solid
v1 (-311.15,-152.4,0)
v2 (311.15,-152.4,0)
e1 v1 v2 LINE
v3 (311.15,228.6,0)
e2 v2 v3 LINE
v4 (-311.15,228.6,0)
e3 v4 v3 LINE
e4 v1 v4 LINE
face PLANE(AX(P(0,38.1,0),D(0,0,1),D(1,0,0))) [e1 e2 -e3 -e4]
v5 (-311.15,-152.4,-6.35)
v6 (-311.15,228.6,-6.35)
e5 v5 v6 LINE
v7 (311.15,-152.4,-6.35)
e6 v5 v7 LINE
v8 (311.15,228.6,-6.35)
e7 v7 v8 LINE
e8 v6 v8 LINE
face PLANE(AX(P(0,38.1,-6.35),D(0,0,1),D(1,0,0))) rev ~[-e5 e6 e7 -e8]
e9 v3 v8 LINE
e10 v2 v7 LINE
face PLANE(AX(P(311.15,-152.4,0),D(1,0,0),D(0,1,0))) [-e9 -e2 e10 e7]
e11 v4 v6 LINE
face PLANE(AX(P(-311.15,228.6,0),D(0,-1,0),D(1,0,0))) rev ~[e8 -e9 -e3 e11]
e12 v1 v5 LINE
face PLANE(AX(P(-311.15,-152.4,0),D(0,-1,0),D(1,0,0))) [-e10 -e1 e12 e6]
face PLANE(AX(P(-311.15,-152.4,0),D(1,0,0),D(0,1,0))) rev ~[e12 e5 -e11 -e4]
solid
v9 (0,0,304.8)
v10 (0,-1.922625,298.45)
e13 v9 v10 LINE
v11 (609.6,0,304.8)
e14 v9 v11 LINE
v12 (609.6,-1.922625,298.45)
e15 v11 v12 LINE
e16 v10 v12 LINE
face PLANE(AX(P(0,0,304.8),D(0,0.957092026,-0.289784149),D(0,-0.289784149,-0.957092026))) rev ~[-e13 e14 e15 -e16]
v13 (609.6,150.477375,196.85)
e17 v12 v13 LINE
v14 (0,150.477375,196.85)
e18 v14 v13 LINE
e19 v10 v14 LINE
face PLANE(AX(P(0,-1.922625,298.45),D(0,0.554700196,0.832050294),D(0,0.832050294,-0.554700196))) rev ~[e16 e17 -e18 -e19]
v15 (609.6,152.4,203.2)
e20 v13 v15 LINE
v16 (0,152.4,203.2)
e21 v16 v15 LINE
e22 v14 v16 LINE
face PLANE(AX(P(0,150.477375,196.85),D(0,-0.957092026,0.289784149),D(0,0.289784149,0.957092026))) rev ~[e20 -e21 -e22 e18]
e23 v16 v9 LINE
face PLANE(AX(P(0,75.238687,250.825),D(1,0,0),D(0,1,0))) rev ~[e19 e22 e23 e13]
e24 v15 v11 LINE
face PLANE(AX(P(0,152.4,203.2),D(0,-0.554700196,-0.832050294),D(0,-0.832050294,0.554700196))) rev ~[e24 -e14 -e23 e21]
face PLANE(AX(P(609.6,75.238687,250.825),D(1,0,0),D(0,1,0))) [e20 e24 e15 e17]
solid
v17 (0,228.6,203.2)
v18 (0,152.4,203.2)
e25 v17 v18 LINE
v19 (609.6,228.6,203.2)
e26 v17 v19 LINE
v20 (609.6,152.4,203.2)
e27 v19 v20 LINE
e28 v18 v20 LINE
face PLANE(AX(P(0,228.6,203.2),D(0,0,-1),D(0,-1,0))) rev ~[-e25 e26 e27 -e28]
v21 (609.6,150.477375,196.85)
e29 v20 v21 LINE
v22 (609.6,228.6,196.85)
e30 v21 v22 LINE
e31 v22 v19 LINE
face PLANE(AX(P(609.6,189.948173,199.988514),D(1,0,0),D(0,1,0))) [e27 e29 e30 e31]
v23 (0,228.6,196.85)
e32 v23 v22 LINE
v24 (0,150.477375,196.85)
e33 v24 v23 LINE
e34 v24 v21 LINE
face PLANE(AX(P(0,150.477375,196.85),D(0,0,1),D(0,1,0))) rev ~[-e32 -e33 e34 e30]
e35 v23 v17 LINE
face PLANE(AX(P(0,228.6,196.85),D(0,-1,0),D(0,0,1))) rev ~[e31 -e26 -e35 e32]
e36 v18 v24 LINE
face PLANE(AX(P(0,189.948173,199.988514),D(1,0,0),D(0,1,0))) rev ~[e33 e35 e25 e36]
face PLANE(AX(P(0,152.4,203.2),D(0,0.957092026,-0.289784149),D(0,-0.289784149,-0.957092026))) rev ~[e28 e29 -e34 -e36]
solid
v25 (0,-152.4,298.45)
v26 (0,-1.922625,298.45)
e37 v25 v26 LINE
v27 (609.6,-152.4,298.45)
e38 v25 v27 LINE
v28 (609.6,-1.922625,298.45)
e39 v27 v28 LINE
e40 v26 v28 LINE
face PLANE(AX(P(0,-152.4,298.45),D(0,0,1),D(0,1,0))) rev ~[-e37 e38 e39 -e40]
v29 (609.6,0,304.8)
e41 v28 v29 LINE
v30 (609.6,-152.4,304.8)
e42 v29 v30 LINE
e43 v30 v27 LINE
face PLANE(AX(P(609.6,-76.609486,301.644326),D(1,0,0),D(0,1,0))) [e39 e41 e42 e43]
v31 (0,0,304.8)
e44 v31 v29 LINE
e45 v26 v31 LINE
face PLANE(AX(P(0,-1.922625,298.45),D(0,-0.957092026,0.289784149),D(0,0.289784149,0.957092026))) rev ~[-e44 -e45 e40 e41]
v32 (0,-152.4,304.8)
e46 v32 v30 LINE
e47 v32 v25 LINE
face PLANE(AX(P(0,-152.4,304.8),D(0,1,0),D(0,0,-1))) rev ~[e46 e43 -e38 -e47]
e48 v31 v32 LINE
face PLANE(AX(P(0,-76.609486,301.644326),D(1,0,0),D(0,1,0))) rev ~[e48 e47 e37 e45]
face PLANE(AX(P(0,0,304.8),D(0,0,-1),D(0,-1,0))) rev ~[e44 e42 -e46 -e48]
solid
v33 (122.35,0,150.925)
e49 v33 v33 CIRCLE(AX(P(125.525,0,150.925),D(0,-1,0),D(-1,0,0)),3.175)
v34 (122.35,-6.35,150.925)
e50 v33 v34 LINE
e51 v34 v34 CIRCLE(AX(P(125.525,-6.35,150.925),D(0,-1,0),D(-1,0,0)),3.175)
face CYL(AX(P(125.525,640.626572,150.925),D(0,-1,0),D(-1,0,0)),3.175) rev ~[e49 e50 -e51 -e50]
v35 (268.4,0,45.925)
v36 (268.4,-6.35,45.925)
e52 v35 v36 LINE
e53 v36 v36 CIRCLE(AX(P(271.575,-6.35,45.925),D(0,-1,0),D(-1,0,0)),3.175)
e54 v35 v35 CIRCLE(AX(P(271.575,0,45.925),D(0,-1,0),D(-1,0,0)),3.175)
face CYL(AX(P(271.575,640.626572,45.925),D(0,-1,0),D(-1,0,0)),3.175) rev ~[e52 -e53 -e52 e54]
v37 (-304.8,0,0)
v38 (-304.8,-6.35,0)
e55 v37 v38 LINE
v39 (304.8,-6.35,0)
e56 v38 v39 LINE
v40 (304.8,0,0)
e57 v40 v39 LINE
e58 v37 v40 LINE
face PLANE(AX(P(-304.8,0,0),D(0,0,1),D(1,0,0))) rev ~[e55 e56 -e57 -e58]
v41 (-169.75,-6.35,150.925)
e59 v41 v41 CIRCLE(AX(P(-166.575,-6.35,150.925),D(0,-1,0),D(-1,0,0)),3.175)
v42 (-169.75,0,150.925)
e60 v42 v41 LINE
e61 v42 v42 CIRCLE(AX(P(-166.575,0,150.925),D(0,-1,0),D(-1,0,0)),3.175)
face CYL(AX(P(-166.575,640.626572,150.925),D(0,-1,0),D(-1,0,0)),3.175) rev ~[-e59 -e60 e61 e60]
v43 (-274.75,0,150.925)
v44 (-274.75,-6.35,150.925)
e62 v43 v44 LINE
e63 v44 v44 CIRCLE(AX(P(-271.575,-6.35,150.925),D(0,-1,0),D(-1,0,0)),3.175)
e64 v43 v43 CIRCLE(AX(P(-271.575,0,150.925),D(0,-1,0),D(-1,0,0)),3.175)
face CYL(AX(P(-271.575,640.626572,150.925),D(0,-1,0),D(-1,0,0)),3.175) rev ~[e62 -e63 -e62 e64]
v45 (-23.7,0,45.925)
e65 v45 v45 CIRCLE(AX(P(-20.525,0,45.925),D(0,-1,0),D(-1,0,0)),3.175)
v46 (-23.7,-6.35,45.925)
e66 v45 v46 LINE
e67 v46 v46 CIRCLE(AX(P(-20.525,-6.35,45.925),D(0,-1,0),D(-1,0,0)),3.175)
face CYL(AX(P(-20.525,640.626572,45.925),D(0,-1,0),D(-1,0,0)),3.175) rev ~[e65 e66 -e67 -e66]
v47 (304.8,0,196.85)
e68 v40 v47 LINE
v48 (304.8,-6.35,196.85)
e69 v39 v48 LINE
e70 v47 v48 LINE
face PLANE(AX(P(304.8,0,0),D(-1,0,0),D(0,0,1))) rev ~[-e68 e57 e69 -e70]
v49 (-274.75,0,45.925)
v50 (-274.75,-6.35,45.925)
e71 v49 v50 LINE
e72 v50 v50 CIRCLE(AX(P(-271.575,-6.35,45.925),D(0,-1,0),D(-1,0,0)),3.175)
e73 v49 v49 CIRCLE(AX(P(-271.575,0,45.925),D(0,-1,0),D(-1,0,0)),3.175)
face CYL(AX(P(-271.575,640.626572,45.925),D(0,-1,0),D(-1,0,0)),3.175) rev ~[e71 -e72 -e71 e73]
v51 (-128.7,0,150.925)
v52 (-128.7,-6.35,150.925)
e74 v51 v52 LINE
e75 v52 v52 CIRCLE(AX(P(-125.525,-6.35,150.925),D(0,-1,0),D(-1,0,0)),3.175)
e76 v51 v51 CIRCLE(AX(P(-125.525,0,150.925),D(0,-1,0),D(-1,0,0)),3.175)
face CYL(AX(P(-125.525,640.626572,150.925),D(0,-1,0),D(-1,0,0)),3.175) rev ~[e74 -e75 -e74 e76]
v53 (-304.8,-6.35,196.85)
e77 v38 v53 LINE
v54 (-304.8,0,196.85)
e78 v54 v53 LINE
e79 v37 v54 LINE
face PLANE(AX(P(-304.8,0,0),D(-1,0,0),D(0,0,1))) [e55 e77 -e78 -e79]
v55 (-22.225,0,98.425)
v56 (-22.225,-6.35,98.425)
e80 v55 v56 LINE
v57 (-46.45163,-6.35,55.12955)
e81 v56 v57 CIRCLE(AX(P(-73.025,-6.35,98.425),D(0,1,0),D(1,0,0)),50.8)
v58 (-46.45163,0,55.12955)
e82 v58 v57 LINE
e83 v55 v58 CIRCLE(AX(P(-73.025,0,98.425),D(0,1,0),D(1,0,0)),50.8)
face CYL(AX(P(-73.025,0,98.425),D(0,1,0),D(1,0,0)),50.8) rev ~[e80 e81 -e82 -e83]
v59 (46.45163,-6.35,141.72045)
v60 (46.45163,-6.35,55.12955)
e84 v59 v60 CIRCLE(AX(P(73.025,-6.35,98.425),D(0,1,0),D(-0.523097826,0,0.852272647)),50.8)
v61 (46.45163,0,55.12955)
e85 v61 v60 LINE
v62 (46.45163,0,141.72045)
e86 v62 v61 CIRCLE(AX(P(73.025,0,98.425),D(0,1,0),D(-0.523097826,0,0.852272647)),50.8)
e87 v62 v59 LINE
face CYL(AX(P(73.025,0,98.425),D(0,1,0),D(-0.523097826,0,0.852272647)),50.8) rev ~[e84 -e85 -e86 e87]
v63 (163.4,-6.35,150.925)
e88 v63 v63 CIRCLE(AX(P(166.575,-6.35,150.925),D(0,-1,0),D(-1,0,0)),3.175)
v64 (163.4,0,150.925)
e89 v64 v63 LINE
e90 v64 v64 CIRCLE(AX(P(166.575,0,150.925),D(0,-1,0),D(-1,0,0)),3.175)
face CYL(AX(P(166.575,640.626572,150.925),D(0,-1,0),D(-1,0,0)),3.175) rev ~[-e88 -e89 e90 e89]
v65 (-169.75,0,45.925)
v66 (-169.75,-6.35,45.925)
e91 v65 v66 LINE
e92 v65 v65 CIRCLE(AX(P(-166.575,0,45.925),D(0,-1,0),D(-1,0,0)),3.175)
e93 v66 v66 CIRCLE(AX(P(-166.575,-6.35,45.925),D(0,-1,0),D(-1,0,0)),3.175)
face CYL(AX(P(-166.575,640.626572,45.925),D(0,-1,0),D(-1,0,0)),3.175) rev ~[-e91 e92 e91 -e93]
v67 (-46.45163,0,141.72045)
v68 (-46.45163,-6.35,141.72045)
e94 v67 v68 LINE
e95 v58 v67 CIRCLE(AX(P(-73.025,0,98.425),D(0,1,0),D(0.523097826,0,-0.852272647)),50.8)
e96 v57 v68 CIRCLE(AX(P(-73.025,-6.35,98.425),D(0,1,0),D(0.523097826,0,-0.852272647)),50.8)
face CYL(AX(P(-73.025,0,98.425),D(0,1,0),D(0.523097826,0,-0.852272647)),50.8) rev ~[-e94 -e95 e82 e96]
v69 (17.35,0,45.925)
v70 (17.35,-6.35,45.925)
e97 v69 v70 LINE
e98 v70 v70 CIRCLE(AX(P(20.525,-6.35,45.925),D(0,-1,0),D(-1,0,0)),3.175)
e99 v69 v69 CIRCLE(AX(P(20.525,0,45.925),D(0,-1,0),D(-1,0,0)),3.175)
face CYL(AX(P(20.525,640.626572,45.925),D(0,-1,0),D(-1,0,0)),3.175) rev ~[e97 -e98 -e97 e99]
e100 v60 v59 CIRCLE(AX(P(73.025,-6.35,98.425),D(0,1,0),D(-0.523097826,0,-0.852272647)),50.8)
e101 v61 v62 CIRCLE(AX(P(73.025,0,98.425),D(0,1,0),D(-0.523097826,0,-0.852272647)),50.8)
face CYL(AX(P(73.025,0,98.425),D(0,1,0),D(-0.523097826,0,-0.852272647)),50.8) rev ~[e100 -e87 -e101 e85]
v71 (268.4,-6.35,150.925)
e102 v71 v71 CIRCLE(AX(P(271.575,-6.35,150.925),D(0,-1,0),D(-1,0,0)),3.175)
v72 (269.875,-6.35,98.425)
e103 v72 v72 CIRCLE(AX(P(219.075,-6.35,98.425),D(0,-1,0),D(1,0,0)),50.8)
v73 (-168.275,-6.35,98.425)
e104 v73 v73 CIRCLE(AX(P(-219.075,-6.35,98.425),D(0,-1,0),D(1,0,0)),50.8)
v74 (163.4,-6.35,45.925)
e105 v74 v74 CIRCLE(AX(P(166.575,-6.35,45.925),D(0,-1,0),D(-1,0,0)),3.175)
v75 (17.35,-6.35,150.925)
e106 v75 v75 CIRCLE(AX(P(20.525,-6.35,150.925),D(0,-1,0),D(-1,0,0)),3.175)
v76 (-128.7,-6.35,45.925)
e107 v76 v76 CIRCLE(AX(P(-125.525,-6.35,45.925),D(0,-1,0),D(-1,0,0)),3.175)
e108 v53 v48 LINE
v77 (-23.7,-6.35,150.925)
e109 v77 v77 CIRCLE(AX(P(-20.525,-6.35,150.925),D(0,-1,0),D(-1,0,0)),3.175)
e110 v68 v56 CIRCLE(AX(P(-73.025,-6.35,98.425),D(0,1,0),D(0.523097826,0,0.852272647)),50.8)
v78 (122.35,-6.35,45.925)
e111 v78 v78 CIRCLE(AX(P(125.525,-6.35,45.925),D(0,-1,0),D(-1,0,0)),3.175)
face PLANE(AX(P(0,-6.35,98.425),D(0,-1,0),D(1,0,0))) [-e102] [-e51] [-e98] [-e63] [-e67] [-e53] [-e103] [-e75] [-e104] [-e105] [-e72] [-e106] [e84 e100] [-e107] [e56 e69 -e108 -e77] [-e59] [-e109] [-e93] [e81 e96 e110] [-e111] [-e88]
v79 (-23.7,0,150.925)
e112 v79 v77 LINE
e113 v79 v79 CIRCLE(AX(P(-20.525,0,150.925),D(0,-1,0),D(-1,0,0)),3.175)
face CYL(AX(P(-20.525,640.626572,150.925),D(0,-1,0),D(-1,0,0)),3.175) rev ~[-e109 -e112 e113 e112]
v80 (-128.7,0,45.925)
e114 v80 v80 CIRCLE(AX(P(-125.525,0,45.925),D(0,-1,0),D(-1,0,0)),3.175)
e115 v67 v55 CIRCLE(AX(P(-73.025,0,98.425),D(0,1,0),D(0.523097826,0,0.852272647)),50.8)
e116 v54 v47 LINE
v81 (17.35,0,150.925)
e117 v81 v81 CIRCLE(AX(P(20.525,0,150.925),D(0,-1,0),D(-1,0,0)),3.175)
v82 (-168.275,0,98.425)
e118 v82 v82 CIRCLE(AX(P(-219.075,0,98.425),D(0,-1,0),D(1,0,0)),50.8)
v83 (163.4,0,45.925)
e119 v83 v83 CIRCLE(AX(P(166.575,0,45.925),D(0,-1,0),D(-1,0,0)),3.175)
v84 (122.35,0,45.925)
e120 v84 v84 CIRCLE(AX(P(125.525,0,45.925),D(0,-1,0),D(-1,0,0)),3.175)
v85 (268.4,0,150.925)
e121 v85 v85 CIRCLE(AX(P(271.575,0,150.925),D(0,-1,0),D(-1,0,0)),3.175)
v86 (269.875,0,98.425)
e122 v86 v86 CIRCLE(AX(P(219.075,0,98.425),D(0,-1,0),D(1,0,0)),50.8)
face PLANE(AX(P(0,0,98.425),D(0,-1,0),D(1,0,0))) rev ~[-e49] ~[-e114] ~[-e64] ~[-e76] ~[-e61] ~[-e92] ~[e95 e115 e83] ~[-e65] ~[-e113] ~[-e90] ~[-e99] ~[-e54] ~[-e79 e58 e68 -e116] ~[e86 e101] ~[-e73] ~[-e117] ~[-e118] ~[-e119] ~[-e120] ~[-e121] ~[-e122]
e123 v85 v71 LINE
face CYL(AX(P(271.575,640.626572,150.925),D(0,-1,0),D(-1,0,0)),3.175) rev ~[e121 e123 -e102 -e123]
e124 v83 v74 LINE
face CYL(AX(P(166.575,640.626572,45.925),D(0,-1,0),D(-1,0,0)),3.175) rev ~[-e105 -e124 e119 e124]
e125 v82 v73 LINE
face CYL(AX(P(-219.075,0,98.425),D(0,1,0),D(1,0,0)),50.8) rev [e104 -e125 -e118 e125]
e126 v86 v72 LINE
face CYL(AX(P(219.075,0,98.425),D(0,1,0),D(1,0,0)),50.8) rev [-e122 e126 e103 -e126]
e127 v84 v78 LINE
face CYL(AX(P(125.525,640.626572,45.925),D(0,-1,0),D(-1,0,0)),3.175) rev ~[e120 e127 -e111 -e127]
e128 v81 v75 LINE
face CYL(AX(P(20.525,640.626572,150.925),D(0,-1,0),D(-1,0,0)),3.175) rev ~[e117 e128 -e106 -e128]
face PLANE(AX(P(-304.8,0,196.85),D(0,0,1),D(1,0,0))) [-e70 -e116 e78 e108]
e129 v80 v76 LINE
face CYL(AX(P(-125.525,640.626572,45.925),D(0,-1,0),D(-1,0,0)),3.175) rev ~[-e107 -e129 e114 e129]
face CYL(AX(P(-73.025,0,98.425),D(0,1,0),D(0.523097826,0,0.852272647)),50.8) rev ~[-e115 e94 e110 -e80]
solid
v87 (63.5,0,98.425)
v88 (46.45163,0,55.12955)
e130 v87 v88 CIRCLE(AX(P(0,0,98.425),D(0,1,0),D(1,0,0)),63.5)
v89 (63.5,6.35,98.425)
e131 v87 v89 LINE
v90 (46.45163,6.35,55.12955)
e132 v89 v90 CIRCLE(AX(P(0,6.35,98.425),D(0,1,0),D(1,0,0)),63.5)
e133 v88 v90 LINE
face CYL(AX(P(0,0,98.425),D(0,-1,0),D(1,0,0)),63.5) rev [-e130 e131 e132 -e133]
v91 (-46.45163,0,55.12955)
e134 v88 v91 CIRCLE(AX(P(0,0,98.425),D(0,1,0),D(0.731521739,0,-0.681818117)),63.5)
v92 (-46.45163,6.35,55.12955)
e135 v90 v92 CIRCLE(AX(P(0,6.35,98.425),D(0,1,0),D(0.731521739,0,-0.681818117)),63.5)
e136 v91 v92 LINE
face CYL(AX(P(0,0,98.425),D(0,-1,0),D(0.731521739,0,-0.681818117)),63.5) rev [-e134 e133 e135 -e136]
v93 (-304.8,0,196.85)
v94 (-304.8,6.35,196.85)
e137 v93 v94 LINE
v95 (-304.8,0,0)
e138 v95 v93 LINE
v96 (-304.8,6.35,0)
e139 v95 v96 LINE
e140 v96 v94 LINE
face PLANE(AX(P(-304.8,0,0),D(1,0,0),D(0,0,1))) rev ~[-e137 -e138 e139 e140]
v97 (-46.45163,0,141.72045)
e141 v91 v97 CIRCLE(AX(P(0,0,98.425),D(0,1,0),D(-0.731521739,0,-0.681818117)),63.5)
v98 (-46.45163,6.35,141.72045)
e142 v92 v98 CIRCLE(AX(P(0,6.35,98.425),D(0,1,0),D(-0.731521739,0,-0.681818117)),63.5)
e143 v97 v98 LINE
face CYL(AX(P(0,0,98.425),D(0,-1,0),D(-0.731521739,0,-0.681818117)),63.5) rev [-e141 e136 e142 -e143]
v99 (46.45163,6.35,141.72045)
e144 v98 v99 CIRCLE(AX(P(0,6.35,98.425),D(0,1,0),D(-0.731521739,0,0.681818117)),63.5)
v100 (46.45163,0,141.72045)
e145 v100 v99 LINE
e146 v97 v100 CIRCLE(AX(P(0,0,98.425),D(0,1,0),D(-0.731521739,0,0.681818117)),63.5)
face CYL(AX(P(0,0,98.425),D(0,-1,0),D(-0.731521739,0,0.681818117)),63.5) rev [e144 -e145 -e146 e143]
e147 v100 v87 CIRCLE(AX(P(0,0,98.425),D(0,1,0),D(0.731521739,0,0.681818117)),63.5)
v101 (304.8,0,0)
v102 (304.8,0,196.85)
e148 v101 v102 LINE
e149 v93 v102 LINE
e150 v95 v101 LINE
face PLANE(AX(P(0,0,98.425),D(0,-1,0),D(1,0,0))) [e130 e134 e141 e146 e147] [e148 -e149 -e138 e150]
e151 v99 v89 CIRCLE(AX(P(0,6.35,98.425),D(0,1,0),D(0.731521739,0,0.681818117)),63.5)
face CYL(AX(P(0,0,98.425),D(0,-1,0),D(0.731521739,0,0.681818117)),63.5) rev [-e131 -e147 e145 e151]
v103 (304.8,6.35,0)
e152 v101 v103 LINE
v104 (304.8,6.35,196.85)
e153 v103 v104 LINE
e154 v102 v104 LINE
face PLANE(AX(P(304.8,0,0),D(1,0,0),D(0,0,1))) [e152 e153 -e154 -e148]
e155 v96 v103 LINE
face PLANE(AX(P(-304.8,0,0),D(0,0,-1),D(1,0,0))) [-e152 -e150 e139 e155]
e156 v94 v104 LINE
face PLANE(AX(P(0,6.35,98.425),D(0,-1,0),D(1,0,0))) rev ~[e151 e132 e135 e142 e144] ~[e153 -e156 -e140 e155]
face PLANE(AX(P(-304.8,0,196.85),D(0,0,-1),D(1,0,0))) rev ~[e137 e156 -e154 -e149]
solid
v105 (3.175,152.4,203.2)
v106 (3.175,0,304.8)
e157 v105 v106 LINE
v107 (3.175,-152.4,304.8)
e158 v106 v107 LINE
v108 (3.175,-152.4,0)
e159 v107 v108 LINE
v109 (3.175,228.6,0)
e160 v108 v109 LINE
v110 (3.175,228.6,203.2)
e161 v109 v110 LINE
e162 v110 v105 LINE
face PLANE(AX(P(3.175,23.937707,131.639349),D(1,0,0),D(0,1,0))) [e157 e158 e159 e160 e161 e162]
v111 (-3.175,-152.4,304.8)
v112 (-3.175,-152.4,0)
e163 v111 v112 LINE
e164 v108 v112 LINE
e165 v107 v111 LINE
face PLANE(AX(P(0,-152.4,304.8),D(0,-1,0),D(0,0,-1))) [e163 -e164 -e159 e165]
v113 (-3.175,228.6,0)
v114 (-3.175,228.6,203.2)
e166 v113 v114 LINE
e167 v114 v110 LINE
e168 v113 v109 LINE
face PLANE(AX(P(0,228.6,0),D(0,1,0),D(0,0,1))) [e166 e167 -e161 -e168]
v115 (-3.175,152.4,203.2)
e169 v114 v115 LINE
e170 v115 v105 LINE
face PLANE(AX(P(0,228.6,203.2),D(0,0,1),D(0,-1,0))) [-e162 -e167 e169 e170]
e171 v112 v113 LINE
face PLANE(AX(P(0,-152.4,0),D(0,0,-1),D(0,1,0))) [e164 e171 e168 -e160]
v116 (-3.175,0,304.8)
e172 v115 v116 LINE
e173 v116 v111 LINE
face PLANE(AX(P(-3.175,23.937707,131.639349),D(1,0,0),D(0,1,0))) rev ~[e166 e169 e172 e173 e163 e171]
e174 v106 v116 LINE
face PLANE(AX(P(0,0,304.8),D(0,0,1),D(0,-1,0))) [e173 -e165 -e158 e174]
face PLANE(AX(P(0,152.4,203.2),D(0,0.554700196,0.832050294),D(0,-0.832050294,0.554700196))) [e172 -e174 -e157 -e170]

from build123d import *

# Parameters (mm, degrees)
F1_DEPTH = 3.175
F2_W     = 622.3
F2_H     = 381
F3_DEPTH = 6.35
F4_W     = 609.6
F4_H     = 196.85
F4_R     = 50.8
F5_DEPTH = 6.35
F6_DEPTH = 609.6
F7_DEPTH = 609.6
F8_DEPTH = 609.6
F9_DEPTH = 6.35
F10_D    = 6.35


# Not quite as in the source:
# - a feature names something its author has since deleted; it is built from what else it names


with BuildPart() as f1:
    # F0 (on Right) → F1 (new body, symmetric)
    with BuildSketch(Plane.YZ):
        Polygon((-152.4, 298.45), (-152.4, 0), (228.6, 0), (228.6, 196.85), (150.4773747004, 196.85), (-1.9226252996, 298.45), align=None)
        Polygon((150.4773747004, 196.85), (228.6, 196.85), (228.6, 203.2), (152.4, 203.2), align=None)
        Polygon((0, 304.8), (-1.9226252996, 298.45), (150.4773747004, 196.85), (152.4, 203.2), align=None)
        Polygon((-152.4, 304.8), (-152.4, 298.45), (-1.9226252996, 298.45), (0, 304.8), align=None)
    extrude(amount=F1_DEPTH, both=True)


with BuildPart() as f3:
    # F2 (on Top) → F3 (new body)
    with BuildSketch(Plane.XY):
        with Locations((0, 38.1)):
            Rectangle(F2_W, F2_H)
    extrude(amount=-F3_DEPTH)


with BuildPart() as f5:
    # F4 (on Front) → F5 (new body)
    with BuildSketch(Plane.XZ):
        with Locations((0, 98.425)):
            Rectangle(F4_W, F4_H)
        with Locations((-219.075, 98.425)):
            Circle(F4_R, mode=Mode.SUBTRACT)
        with BuildLine():
            ThreePointArc((-46.4516304348, 55.1295495467), (-123.825, 98.425), (-46.4516304348, 141.7204504533))
            ThreePointArc((-46.4516304348, 141.7204504533), (0, 161.925), (46.4516304348, 141.7204504533))
            ThreePointArc((46.4516304348, 141.7204504533), (97.831378475, 142.756519114), (123.825, 98.425))
            ThreePointArc((123.825, 98.425), (97.831378475, 54.093480886), (46.4516304348, 55.1295495467))
            ThreePointArc((46.4516304348, 55.1295495467), (0, 34.925), (-46.4516304348, 55.1295495467))
        make_face(mode=Mode.SUBTRACT)
        with Locations((219.075, 98.425)):
            Circle(F4_R, mode=Mode.SUBTRACT)
        with Locations((-219.075, 98.425)):
            Circle(F4_R)
        with Locations((219.075, 98.425)):
            Circle(F4_R)
        with BuildLine():
            ThreePointArc((-46.4516304348, 55.1295495467), (-63.5, 98.425), (-46.4516304348, 141.7204504533))
            ThreePointArc((-46.4516304348, 141.7204504533), (-123.825, 98.425), (-46.4516304348, 55.1295495467))
        make_face()
        with BuildLine():
            ThreePointArc((123.825, 98.425), (97.831378475, 142.756519114), (46.4516304348, 141.7204504533))
            ThreePointArc((46.4516304348, 141.7204504533), (59.0843825922, 121.690548214), (63.5, 98.425))
            ThreePointArc((63.5, 98.425), (59.0843825922, 75.159451786), (46.4516304348, 55.1295495467))
            ThreePointArc((46.4516304348, 55.1295495467), (97.831378475, 54.093480886), (123.825, 98.425))
        make_face()
    extrude(amount=-F5_DEPTH)


with BuildPart() as f6:
    # F0 (on Right) → F6 (new body)
    with BuildSketch(Plane.YZ):
        Polygon((-152.4, 304.8), (-152.4, 298.45), (-1.9226252996, 298.45), (0, 304.8), align=None)
    extrude(amount=F6_DEPTH)


with BuildPart() as f7:
    # F0 (on Right) → F7 (new body)
    with BuildSketch(Plane.YZ):
        Polygon((0, 304.8), (-1.9226252996, 298.45), (150.4773747004, 196.85), (152.4, 203.2), align=None)
    extrude(amount=F7_DEPTH)


with BuildPart() as f8:
    # F0 (on Right) → F8 (new body)
    with BuildSketch(Plane.YZ):
        Polygon((150.4773747004, 196.85), (228.6, 196.85), (228.6, 203.2), (152.4, 203.2), align=None)
    extrude(amount=F8_DEPTH)


with BuildPart() as f9:
    # F4 (on Front) → F9 (new body)
    with BuildSketch(Plane.XZ):
        with Locations((0, 98.425)):
            Rectangle(F4_W, F4_H)
        with Locations((-219.075, 98.425)):
            Circle(F4_R, mode=Mode.SUBTRACT)
        with BuildLine():
            ThreePointArc((-46.4516304348, 55.1295495467), (-123.825, 98.425), (-46.4516304348, 141.7204504533))
            ThreePointArc((-46.4516304348, 141.7204504533), (0, 161.925), (46.4516304348, 141.7204504533))
            ThreePointArc((46.4516304348, 141.7204504533), (97.831378475, 142.756519114), (123.825, 98.425))
            ThreePointArc((123.825, 98.425), (97.831378475, 54.093480886), (46.4516304348, 55.1295495467))
            ThreePointArc((46.4516304348, 55.1295495467), (0, 34.925), (-46.4516304348, 55.1295495467))
        make_face(mode=Mode.SUBTRACT)
        with Locations((219.075, 98.425)):
            Circle(F4_R, mode=Mode.SUBTRACT)
        with BuildLine():
            ThreePointArc((-46.4516304348, 141.7204504533), (-28.693480886, 123.231378475), (-22.225, 98.425))
            ThreePointArc((-22.225, 98.425), (-28.693480886, 73.618621525), (-46.4516304348, 55.1295495467))
            ThreePointArc((-46.4516304348, 55.1295495467), (0, 34.925), (46.4516304348, 55.1295495467))
            ThreePointArc((46.4516304348, 55.1295495467), (22.225, 98.425), (46.4516304348, 141.7204504533))
            ThreePointArc((46.4516304348, 141.7204504533), (0, 161.925), (-46.4516304348, 141.7204504533))
        make_face()
    extrude(amount=F9_DEPTH)

    # F10 (through all)
    with Locations(Plane(origin=(0, 0, 0), x_dir=(1, 0, 0), z_dir=(0, 1, 0))):
        with Locations((-271.575, -150.925), (-166.575, -150.925), (-125.525, -150.925), (-125.525, -45.925), (-166.575, -45.925), (-271.575, -45.925), (-20.525, -150.925), (20.525, -150.925), (-20.525, -45.925), (20.525, -45.925), (125.525, -150.925), (166.575, -150.925), (271.575, -150.925), (271.575, -45.925), (166.575, -45.925), (125.525, -45.925)):
            Hole(F10_D / 2)


solid = Compound([f1.part, f3.part, f5.part, f6.part, f7.part, f8.part, f9.part])
